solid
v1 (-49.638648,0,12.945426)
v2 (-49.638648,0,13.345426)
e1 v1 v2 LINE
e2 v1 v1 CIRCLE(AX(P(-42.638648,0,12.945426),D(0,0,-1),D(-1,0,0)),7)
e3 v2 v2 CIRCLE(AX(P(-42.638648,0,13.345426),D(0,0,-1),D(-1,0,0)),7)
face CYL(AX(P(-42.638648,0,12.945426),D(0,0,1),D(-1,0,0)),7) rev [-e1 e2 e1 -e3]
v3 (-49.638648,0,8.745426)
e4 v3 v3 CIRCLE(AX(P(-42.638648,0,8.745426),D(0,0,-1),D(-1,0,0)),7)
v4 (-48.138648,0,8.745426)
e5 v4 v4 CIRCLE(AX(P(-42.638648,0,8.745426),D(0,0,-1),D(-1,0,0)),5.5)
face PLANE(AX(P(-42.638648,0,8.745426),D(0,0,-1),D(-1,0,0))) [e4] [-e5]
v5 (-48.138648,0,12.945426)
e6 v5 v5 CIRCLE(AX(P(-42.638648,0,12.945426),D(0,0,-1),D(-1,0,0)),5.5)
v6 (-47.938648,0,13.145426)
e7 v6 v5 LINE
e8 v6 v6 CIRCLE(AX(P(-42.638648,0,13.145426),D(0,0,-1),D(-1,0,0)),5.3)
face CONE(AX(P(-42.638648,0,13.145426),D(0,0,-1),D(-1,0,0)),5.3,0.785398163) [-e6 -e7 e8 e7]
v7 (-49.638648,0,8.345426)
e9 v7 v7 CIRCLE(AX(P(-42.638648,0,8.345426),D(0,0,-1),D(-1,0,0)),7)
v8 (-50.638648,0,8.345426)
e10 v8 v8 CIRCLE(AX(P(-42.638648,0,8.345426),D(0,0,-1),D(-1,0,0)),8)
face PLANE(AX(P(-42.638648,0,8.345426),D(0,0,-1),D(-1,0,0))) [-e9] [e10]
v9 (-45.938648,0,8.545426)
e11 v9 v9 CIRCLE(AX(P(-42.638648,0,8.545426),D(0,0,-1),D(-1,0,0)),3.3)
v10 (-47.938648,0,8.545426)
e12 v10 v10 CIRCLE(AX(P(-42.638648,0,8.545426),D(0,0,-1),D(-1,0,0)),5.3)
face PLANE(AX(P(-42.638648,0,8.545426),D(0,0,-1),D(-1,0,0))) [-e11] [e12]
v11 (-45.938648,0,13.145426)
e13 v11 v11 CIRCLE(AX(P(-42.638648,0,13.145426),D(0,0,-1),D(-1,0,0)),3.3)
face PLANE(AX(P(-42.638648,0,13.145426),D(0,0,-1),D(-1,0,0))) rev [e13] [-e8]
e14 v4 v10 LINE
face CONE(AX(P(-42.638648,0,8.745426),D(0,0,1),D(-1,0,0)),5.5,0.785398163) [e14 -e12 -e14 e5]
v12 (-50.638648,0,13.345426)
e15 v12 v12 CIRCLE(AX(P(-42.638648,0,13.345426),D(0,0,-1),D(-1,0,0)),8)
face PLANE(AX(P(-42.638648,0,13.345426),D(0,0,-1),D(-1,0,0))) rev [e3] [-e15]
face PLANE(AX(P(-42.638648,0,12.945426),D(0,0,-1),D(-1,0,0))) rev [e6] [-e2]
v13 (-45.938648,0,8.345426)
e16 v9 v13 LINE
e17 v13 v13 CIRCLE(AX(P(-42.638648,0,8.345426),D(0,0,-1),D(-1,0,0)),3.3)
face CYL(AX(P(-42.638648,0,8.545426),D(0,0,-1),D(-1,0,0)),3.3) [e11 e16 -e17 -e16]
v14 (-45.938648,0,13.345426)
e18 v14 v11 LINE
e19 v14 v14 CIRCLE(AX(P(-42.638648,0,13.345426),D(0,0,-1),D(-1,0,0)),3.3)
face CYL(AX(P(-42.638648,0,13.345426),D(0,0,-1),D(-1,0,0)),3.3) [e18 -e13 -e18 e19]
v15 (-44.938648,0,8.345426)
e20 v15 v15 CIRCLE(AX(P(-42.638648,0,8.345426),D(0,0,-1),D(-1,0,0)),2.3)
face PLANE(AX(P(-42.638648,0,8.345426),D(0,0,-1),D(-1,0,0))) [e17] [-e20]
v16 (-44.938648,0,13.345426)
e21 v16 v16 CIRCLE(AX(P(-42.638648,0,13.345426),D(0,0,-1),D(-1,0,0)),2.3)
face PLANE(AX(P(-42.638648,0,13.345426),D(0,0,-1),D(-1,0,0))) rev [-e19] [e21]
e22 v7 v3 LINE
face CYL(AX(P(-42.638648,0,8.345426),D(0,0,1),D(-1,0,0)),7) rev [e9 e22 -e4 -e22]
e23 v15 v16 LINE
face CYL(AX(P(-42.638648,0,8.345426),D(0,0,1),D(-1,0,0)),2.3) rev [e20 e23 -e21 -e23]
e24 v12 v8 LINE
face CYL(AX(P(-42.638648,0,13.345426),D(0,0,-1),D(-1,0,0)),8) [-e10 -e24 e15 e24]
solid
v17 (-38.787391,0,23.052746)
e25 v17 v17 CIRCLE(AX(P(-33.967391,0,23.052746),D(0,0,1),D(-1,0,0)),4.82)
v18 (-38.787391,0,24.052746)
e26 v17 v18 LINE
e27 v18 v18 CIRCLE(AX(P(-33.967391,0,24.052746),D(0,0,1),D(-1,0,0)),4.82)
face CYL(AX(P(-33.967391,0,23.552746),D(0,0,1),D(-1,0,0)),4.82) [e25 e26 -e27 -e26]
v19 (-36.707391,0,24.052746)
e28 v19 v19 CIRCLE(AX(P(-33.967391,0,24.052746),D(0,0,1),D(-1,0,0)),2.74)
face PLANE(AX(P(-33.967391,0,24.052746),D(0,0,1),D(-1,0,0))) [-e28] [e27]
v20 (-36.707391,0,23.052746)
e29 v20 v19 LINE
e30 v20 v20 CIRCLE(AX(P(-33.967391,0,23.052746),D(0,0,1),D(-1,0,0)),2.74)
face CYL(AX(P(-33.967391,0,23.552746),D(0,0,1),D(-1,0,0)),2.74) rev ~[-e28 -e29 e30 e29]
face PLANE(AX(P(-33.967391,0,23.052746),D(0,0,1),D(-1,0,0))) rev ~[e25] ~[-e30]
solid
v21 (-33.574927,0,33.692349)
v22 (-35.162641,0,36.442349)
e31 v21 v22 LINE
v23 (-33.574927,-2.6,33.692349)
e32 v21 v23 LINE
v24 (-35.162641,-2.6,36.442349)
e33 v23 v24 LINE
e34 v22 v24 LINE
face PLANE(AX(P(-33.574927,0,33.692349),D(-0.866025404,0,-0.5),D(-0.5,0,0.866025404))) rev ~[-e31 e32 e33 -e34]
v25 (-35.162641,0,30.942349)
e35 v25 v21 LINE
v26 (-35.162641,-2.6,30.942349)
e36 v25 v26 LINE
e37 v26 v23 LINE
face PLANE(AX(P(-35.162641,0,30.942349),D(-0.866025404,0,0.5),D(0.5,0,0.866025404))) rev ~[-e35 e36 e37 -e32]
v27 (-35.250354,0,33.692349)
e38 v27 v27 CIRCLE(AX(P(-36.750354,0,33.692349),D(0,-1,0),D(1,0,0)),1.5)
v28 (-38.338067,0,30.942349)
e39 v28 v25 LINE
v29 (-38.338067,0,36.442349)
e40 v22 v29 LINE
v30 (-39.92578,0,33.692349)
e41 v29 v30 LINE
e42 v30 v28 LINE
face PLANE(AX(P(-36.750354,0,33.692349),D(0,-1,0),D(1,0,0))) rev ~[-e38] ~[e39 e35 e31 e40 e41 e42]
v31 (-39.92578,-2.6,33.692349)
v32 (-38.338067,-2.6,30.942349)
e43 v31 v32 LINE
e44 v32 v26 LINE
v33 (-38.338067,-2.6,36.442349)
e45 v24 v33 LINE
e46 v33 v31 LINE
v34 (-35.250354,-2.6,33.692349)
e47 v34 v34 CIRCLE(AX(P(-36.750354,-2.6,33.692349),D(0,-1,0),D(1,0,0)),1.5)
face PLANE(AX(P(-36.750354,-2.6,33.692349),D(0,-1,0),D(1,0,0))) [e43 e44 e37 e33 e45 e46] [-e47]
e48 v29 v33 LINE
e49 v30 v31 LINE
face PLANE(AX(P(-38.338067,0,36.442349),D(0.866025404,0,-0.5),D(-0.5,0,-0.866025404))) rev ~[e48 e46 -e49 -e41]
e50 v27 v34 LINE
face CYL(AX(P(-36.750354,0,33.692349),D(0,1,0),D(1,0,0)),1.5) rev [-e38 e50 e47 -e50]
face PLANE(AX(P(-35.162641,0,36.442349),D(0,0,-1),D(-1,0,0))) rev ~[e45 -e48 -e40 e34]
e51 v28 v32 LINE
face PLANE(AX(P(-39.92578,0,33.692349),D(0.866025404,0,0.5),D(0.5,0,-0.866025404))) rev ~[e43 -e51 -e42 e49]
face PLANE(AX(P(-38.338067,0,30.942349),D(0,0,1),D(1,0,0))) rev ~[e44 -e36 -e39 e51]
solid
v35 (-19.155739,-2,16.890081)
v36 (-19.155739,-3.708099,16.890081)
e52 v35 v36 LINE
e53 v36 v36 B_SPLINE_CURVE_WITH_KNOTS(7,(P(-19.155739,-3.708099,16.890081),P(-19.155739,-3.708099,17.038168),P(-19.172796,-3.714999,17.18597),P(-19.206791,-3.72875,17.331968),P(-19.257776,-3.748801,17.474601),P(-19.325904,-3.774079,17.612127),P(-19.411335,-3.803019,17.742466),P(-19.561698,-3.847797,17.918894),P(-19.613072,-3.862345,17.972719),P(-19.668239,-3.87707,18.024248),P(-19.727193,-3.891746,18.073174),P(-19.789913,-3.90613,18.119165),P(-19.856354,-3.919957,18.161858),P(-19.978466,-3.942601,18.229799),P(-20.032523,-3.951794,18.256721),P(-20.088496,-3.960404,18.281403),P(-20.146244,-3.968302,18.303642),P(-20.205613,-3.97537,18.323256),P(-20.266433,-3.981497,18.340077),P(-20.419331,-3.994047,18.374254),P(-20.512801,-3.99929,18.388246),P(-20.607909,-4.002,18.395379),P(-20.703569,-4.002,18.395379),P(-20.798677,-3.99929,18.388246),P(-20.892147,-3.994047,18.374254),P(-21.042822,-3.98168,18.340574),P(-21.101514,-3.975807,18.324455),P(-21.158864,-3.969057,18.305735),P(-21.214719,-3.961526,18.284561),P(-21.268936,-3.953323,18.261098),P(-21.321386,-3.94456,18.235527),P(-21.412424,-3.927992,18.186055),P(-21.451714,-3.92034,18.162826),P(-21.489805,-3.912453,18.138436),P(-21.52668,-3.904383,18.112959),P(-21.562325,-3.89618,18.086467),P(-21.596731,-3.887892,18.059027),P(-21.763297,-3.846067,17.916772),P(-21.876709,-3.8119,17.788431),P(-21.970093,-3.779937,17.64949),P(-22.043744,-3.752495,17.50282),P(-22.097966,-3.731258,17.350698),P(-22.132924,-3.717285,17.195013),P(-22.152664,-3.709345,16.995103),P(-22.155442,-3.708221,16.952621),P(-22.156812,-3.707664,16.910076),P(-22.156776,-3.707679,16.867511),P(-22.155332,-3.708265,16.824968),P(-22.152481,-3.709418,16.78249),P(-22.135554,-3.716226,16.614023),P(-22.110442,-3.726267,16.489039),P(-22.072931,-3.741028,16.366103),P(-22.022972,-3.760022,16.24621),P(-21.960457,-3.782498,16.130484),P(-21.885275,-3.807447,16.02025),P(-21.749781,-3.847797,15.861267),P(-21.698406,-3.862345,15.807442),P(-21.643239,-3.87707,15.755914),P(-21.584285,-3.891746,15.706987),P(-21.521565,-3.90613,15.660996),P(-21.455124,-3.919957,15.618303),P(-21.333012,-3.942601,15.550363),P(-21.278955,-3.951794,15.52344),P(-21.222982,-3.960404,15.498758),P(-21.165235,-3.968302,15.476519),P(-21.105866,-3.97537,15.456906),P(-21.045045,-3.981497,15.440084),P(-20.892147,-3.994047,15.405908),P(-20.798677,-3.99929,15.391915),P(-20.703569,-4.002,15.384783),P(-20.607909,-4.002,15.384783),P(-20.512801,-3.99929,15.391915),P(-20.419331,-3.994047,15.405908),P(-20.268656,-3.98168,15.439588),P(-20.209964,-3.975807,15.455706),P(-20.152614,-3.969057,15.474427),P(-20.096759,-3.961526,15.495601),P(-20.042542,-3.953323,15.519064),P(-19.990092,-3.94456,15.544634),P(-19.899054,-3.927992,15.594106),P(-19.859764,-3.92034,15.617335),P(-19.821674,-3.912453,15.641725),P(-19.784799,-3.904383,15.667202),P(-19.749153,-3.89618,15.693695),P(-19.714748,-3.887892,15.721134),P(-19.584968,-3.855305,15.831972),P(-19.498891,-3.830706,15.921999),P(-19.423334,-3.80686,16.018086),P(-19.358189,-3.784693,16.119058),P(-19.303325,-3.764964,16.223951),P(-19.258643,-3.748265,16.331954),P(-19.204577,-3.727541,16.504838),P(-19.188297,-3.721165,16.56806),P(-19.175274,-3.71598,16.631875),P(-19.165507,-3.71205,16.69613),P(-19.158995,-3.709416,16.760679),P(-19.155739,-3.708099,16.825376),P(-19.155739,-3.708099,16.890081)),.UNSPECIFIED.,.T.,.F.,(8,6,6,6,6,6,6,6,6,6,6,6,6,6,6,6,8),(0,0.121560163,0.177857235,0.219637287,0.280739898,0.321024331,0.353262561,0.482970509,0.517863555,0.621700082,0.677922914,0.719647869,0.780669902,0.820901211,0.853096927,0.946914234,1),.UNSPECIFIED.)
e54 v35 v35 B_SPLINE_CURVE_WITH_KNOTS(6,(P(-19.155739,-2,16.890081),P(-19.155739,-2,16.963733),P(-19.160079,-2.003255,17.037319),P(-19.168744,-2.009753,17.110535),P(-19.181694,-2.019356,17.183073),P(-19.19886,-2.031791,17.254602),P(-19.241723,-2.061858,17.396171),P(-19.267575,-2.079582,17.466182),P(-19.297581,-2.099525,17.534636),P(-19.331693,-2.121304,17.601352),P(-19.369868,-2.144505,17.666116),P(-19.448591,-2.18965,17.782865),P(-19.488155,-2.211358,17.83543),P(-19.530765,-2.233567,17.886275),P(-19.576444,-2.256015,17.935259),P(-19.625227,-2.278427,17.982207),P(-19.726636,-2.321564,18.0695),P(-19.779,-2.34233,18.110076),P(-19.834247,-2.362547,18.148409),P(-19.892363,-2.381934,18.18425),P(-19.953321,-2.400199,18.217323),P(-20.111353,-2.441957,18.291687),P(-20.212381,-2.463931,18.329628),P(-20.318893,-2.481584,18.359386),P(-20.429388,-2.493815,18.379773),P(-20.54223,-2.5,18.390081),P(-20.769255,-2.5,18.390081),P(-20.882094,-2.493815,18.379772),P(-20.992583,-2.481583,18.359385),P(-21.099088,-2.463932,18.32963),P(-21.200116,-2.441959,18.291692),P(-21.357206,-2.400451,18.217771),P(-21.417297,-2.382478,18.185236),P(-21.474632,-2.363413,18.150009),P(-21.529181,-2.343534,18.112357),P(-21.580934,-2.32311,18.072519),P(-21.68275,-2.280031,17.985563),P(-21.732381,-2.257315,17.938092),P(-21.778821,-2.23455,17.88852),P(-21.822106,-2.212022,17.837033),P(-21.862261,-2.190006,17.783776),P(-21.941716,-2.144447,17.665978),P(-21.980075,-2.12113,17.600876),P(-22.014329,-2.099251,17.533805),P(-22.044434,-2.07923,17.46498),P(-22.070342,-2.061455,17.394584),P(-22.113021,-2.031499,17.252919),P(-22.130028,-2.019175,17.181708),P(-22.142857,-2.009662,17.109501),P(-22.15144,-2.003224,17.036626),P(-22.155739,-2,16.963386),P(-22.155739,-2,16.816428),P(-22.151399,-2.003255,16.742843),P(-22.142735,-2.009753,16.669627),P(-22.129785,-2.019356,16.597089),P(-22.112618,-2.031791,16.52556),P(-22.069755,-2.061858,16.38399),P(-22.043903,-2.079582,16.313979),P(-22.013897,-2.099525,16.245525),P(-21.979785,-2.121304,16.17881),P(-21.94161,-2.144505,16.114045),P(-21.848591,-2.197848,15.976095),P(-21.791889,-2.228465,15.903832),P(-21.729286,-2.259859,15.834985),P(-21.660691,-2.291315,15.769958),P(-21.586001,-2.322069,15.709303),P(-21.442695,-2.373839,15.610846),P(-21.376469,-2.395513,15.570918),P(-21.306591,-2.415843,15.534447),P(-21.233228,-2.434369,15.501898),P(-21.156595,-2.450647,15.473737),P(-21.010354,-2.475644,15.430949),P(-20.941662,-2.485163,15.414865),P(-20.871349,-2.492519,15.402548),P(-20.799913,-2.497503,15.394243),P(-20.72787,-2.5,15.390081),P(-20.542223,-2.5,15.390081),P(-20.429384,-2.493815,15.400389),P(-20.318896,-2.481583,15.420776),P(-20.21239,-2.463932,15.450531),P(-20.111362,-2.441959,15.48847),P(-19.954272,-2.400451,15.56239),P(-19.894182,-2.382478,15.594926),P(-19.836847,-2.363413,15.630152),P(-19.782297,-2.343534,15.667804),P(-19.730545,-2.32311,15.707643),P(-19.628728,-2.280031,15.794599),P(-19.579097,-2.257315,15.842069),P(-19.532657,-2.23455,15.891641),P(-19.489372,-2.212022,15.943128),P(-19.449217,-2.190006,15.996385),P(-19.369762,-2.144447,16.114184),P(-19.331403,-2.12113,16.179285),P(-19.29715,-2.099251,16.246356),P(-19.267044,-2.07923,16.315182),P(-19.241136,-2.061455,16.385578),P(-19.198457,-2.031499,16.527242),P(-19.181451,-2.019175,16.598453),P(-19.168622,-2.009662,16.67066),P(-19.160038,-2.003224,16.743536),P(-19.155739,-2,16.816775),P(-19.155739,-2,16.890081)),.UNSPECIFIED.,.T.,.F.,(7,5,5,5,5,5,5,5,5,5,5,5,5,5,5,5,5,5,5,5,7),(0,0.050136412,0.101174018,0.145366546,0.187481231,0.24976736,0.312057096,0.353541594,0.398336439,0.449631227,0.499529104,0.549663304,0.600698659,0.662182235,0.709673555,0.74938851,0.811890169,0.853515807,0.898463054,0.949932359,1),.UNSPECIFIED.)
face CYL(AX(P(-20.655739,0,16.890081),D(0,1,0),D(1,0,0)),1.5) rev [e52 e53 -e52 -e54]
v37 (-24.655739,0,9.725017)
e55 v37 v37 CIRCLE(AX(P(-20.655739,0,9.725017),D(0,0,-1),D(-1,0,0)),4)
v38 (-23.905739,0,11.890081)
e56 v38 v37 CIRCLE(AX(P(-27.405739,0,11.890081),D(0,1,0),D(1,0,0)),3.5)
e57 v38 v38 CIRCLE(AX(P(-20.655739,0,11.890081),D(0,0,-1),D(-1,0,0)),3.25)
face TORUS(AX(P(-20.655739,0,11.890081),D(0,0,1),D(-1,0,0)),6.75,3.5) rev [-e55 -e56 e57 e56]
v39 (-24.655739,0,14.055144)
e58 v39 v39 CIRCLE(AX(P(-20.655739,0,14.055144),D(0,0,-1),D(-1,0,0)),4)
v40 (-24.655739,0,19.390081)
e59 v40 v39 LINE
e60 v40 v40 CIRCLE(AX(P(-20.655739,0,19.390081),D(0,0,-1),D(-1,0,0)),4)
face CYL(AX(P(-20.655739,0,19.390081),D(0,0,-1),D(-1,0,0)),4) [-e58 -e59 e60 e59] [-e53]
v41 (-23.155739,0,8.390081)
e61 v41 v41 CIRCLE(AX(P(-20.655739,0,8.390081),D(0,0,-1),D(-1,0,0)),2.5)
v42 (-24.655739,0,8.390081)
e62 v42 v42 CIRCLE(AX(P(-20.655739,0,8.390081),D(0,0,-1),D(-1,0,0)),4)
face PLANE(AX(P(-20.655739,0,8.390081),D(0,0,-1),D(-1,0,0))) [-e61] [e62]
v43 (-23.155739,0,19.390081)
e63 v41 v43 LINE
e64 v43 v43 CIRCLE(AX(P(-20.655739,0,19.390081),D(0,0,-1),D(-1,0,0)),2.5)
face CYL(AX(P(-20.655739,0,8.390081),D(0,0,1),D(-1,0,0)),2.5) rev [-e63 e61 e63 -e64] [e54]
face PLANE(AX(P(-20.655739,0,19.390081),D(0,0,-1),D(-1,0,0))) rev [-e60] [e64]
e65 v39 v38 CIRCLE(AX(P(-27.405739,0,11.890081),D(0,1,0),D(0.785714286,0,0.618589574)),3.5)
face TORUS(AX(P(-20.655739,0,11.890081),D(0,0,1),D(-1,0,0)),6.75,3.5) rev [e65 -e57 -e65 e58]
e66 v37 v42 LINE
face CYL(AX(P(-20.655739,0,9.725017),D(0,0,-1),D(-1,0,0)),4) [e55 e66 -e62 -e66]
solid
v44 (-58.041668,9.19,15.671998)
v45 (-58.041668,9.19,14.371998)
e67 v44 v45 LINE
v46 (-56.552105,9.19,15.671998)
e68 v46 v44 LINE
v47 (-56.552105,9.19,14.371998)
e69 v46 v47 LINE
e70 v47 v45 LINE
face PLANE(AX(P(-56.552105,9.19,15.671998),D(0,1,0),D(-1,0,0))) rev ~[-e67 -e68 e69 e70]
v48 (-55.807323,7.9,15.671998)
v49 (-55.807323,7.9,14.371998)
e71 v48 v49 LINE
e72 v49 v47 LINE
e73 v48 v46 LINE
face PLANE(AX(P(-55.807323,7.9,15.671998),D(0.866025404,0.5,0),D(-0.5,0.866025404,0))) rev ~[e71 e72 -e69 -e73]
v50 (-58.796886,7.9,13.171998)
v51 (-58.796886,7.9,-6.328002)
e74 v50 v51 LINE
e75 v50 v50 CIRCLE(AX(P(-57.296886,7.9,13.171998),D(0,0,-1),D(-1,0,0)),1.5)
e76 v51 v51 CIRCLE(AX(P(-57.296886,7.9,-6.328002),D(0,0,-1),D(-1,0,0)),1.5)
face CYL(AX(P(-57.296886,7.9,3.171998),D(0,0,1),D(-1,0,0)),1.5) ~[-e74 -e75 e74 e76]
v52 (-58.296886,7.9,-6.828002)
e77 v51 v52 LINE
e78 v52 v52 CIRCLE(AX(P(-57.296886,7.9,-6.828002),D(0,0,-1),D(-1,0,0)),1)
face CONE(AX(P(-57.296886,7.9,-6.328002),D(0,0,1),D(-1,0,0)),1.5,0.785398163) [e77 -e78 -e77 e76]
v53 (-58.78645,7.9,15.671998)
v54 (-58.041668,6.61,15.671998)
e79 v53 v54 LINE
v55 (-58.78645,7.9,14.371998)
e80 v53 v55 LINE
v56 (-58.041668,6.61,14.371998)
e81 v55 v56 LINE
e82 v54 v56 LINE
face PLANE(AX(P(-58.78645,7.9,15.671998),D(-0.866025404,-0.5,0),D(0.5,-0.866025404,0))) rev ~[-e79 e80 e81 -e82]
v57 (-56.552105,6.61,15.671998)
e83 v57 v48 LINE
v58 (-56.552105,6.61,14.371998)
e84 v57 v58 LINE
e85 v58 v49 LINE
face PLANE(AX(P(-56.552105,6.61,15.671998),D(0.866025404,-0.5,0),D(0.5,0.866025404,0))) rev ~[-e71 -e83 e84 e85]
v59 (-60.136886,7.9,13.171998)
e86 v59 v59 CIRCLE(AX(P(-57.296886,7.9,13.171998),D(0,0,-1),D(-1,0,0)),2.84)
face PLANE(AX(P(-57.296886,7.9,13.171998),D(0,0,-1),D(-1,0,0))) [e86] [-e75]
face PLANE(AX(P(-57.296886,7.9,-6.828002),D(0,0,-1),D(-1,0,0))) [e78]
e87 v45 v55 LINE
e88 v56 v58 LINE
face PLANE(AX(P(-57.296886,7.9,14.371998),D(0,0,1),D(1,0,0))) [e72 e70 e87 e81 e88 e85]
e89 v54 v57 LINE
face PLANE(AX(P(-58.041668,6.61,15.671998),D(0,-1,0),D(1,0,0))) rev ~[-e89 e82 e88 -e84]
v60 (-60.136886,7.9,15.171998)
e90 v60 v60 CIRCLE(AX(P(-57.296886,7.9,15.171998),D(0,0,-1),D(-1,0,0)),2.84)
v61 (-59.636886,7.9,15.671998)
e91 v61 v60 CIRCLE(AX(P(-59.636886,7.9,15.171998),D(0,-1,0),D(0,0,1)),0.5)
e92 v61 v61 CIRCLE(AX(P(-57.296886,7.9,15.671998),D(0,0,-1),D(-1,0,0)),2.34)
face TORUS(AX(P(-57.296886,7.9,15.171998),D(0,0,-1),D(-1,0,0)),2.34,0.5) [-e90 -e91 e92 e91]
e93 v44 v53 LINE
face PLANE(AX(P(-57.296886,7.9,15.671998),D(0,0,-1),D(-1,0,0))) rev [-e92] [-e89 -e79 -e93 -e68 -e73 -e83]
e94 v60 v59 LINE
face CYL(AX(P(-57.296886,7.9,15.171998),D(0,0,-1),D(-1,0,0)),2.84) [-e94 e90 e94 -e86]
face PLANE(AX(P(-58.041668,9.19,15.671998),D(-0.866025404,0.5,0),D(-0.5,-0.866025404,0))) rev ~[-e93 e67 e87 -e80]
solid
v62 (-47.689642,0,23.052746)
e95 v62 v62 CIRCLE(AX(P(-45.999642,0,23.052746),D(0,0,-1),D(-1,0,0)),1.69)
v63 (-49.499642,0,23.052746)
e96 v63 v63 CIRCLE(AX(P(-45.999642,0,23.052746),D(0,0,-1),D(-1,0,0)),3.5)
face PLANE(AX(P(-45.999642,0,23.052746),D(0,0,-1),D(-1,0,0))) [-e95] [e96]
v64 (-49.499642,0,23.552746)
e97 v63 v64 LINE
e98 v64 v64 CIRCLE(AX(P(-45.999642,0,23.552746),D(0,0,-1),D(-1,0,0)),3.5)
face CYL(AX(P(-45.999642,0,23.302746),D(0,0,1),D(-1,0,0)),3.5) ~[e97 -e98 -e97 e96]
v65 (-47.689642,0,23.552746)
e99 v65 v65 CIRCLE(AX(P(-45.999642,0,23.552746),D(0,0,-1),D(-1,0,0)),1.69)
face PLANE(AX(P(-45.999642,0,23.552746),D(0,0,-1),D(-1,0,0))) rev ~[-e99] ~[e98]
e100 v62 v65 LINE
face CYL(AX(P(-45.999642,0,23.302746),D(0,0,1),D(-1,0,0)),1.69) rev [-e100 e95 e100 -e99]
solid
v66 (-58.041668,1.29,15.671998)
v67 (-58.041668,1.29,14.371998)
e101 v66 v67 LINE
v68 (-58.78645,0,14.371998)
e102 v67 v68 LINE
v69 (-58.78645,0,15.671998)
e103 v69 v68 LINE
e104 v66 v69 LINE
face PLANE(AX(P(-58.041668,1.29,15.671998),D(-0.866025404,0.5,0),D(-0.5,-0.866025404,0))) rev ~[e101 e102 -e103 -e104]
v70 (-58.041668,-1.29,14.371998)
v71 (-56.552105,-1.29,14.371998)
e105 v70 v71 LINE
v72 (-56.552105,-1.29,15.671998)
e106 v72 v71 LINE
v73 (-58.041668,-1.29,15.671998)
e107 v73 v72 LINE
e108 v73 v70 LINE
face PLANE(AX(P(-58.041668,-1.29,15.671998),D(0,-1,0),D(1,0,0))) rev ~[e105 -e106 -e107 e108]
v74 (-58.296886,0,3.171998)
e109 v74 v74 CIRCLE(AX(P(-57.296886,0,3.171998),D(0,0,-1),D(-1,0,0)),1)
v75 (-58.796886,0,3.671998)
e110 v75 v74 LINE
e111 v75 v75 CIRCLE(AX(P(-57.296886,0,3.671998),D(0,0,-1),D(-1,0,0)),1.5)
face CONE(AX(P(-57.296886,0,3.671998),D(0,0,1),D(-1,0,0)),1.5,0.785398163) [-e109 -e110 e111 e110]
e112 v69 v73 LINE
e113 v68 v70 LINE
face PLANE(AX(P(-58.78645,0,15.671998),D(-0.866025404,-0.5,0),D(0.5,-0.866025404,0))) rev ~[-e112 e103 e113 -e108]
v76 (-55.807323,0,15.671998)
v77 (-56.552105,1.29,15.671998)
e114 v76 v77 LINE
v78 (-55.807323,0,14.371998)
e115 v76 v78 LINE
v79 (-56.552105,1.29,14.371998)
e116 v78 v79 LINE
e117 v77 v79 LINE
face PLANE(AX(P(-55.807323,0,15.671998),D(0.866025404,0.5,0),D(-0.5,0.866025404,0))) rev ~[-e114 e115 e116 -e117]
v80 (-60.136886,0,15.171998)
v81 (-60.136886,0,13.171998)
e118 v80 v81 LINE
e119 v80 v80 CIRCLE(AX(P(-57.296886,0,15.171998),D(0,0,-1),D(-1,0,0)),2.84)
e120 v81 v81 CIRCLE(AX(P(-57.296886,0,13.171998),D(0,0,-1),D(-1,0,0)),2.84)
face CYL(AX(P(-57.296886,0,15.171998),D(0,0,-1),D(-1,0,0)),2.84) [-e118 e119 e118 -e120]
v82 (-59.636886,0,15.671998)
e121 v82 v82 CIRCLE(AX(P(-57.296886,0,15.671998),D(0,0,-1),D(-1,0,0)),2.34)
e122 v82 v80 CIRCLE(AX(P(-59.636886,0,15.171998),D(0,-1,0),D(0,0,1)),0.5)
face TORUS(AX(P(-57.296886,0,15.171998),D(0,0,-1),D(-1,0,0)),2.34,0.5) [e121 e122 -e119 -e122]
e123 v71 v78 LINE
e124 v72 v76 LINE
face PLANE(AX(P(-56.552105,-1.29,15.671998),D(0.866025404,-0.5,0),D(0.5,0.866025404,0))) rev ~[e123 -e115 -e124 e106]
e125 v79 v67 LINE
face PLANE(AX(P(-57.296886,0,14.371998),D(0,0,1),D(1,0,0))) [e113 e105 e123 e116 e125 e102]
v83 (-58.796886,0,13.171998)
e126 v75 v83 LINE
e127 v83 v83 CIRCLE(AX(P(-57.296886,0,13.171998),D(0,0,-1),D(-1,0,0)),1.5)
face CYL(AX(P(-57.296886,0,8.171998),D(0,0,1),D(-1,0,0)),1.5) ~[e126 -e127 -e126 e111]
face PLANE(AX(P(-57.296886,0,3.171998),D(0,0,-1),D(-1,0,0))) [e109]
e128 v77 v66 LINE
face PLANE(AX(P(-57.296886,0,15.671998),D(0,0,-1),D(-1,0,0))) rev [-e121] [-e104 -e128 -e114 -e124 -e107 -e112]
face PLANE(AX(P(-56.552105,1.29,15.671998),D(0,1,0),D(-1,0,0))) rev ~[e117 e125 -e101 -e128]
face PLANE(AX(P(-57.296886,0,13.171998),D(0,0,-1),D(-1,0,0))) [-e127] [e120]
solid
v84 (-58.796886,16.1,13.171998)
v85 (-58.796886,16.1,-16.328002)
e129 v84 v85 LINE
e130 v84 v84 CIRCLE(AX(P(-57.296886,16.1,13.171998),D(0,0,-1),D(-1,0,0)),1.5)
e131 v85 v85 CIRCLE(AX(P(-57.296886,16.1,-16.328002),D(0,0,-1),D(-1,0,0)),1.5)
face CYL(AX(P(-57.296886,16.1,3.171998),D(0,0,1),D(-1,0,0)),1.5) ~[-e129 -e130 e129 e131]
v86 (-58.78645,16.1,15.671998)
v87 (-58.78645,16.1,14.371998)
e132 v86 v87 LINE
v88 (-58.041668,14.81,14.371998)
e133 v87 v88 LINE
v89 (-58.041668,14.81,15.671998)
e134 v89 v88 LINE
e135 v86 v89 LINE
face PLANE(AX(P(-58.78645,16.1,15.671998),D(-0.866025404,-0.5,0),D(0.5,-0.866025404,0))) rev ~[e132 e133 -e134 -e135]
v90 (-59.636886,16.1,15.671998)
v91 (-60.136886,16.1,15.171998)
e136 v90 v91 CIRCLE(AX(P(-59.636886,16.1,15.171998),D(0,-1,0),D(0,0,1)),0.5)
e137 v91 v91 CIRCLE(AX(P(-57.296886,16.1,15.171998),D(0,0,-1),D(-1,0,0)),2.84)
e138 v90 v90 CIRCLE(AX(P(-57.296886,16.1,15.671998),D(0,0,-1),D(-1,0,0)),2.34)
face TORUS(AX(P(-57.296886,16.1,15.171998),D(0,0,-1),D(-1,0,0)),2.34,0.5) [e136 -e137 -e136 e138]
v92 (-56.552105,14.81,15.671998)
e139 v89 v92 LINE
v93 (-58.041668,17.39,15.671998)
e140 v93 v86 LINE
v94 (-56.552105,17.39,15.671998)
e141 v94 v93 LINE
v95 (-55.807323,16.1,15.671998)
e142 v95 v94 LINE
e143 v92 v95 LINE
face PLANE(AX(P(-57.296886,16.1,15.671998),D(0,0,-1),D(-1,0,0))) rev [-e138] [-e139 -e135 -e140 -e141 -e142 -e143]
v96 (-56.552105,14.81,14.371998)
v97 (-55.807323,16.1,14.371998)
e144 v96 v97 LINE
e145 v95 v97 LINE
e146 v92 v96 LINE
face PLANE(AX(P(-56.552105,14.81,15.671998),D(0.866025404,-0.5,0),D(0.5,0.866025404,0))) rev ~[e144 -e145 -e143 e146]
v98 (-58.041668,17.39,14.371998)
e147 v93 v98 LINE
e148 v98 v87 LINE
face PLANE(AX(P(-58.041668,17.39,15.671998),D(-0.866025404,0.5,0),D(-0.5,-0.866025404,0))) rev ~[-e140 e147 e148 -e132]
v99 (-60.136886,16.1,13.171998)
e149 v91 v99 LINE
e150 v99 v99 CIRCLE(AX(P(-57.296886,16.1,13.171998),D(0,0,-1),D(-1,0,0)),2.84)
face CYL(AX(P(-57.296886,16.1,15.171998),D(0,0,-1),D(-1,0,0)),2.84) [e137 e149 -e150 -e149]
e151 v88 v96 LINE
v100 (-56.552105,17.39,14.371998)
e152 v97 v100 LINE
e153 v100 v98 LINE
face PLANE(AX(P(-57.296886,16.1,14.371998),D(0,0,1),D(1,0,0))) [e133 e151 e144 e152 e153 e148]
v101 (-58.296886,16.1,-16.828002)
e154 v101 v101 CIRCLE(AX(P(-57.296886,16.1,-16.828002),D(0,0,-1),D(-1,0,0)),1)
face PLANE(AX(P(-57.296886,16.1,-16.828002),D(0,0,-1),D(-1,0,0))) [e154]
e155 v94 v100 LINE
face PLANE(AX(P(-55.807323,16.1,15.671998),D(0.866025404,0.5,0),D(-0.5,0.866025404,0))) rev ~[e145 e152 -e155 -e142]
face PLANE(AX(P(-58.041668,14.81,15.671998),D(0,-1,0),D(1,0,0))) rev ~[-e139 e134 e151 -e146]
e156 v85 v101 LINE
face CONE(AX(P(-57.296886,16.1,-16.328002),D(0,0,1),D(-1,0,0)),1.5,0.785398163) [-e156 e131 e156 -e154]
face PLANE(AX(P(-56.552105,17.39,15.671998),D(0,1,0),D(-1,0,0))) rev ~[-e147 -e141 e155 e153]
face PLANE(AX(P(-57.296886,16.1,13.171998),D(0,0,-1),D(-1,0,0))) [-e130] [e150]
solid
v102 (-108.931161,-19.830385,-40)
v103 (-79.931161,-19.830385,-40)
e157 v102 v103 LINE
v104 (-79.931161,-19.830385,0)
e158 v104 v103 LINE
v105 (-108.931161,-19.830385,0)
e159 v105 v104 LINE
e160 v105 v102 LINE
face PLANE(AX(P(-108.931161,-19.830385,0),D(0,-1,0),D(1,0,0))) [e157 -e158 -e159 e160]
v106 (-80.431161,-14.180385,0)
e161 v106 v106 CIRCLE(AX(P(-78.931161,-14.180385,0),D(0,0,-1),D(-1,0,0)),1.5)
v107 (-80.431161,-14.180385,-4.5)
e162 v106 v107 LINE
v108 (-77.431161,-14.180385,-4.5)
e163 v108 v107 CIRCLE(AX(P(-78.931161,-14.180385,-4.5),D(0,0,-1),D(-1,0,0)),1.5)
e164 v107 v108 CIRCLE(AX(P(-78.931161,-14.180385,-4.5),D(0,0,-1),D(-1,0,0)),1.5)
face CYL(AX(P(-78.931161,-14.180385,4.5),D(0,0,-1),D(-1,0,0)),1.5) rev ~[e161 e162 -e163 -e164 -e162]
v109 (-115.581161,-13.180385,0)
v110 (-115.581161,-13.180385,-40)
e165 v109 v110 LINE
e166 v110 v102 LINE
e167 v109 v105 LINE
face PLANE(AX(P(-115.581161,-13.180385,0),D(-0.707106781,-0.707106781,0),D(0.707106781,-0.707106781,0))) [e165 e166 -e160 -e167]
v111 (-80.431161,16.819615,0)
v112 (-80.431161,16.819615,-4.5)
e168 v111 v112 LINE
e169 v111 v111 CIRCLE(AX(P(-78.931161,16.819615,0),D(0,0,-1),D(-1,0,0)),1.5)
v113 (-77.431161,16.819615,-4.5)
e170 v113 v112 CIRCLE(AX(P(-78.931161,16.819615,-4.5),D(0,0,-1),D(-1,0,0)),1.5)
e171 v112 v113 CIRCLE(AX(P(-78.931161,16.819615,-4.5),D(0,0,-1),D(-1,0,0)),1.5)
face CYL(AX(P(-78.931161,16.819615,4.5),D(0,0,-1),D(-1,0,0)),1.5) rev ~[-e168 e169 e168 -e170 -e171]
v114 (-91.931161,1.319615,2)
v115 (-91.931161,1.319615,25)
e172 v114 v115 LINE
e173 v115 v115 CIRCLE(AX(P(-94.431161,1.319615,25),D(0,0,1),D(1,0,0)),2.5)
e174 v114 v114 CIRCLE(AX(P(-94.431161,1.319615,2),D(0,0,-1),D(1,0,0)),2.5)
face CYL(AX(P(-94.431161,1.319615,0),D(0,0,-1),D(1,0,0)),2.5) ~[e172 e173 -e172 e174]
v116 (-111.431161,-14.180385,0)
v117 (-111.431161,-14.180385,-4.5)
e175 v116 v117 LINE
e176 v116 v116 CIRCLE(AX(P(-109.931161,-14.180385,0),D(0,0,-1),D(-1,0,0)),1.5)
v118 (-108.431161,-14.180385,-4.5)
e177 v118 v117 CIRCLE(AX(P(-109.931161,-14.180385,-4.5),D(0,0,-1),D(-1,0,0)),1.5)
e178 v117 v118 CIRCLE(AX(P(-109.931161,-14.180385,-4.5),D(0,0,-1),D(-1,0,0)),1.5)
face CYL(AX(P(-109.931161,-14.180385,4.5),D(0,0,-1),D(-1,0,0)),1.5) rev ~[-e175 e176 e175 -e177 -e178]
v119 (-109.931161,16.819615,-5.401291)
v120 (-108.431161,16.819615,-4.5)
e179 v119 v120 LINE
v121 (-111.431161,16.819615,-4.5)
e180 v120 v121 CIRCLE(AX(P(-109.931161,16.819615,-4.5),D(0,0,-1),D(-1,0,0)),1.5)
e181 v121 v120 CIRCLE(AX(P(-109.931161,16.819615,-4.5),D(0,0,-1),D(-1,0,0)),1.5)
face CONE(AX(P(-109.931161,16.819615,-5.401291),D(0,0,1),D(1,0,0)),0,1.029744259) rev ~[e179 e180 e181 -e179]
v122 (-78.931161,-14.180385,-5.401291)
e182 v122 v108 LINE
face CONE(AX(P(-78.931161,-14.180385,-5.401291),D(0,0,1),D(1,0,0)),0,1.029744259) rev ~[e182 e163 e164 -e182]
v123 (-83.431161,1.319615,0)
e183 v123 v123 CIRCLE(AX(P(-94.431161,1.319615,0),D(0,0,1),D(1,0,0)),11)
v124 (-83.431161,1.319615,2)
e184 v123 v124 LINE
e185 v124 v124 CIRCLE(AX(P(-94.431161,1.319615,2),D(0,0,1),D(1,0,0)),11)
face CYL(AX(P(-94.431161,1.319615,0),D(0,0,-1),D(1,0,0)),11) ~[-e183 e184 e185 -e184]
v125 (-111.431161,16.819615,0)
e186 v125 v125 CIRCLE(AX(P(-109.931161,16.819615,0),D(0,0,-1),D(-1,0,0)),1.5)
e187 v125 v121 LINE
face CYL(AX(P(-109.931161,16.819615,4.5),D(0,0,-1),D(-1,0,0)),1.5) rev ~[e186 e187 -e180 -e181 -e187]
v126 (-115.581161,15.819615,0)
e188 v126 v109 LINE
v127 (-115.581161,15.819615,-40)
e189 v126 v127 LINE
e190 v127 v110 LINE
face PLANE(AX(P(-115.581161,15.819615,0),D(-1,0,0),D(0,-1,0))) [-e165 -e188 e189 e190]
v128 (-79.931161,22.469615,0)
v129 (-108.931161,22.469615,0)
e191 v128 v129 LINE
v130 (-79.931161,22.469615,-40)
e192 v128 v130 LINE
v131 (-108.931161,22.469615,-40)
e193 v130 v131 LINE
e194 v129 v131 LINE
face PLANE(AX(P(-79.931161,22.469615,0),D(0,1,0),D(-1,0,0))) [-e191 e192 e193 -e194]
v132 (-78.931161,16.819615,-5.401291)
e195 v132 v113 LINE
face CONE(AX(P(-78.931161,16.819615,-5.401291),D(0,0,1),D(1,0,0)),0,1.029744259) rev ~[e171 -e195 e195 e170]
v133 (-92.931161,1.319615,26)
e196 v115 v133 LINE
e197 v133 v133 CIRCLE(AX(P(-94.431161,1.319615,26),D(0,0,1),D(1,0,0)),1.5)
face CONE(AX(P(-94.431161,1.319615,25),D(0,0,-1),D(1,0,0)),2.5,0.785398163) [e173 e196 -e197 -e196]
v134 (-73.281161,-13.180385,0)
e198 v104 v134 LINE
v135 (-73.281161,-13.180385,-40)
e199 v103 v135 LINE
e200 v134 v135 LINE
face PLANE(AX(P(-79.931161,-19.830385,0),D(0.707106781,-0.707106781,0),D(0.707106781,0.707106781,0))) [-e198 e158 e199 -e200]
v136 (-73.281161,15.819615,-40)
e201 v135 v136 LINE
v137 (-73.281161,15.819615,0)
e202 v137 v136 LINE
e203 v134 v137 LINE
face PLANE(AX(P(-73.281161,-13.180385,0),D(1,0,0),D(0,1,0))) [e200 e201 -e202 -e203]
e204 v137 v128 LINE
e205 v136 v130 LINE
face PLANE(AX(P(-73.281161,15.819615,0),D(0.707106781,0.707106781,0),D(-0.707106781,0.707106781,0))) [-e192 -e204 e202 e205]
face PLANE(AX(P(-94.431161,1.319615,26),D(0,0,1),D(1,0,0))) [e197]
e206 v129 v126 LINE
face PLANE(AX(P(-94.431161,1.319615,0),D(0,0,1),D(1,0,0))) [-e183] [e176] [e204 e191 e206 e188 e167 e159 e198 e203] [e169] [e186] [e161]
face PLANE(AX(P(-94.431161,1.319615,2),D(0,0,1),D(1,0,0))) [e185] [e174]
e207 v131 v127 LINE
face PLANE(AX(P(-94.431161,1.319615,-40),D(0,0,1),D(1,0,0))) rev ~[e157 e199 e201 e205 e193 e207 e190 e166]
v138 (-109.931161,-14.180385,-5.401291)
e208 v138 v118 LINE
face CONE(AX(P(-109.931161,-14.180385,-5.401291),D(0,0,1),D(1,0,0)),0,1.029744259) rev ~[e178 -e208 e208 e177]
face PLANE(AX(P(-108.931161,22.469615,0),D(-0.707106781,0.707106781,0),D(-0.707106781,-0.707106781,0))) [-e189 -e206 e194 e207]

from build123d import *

# Parameters (mm, degrees)
F0_R       = 1.5
F2_DEPTH   = 25
F4_R       = 11
F4_R_2     = 2.5
F5_DEPTH   = 2
F6_DEPTH   = 26
F7_DEPTH   = 40
F8_D       = 3
F8_DEPTH   = 4.5
F8_TIP     = 0.9012909285
F9_SIZE    = 1
F0_W       = 1.81
F0_H       = 0.5
F0_W_2     = 1.5
F0_H_2     = 10
F13_DEPTH  = 1.3
F15_DEPTH  = 20
F0_W_3     = 2.08
F0_H_3     = 1
F18_DEPTH  = 10
F19_SIZE   = 0.5
F19_2_SIZE = 0.5
F19_3_SIZE = 0.5
F20_DEPTH  = 2.6


with BuildPart() as f1:
    # F0 (on Front) → F1 (revolve)
    with BuildSketch(Plane.XZ):
        with BuildLine():
            Line((-23.1557391211, 19.3900806742), (-24.6557391211, 19.3900806742))
            Line((-24.6557391211, 19.3900806742), (-24.6557391211, 14.0551441836))
            ThreePointArc((-24.6557391211, 14.0551441836), (-24.0985499823, 13.0357245979), (-23.9057391211, 11.8900806742))
            ThreePointArc((-23.9057391211, 11.8900806742), (-24.0985499823, 10.7444367504), (-24.6557391211, 9.7250171647))
            Line((-24.6557391211, 9.7250171647), (-24.6557391211, 8.3900806742))
            Line((-24.6557391211, 8.3900806742), (-23.1557391211, 8.3900806742))
            Line((-23.1557391211, 8.3900806742), (-23.1557391211, 19.3900806742))
        make_face()
    revolve(axis=Axis((-20.6557391211, 0, 13.8900806742), (0, 0, -1)))

    # F0 (on Front) → F2 (cut)
    with BuildSketch(Plane.XZ):
        with Locations((-20.6557391211, 16.8900806742)):
            Circle(F0_R)
    extrude(amount=F2_DEPTH, mode=Mode.SUBTRACT)


with BuildPart() as f3:
    # F0 (on Front) → F3 (revolve)
    with BuildSketch(Plane.XZ):
        Polygon((-49.6386482716, 13.3454260603), (-50.6386482716, 13.3454260603), (-50.6386482716, 8.3454260603), (-49.6386482716, 8.3454260603), (-49.6386482716, 8.7454260603), (-48.1386482716, 8.7454260603), (-47.9386482716, 8.5454260603), (-45.9386482716, 8.5454260603), (-45.9386482716, 8.3454260603), (-44.9386482716, 8.3454260603), (-44.9386482716, 13.3454260603), (-45.9386482716, 13.3454260603), (-45.9386482716, 13.1454260603), (-47.9386482716, 13.1454260603), (-48.1386482716, 12.9454260603), (-49.6386482716, 12.9454260603), align=None)
    revolve(axis=Axis((-42.6386482716, 0, 10.8454260603), (0, 0, -1)))


with BuildPart() as f5:
    # F4 (on Top) → F5 (new body)
    with BuildSketch(Plane.XY):
        with Locations((-94.4311614871, 1.3196146563)):
            Circle(F4_R)
        with Locations((-94.4311614871, 1.3196146563)):
            Circle(F4_R_2, mode=Mode.SUBTRACT)
        with Locations((-94.4311614871, 1.3196146563)):
            Circle(F4_R_2)
    extrude(amount=F5_DEPTH)

    # F4 (on Top) → F6 (join)
    with BuildSketch(Plane.XY):
        with Locations((-94.4311614871, 1.3196146563)):
            Circle(F4_R_2)
    extrude(amount=F6_DEPTH)

    # F4 (on Top) → F7 (join)
    with BuildSketch(Plane.XY):
        Polygon((-108.9311614871, 22.4696146563), (-115.5811614871, 15.8196146563), (-115.5811614871, -13.1803853437), (-108.9311614871, -19.8303853437), (-79.9311614871, -19.8303853437), (-73.2811614871, -13.1803853437), (-73.2811614871, 15.8196146563), (-79.9311614871, 22.4696146563), align=None)
        with Locations((-94.4311614871, 1.3196146563)):
            Circle(F4_R, mode=Mode.SUBTRACT)
        with Locations((-94.4311614871, 1.3196146563)):
            Circle(F4_R)
        with Locations((-94.4311614871, 1.3196146563)):
            Circle(F4_R_2, mode=Mode.SUBTRACT)
        with Locations((-94.4311614871, 1.3196146563)):
            Circle(F4_R_2)
    extrude(amount=-F7_DEPTH)

    # F8
    with Locations(Plane.XY):
        with Locations((-78.9311614871, 16.8196146563), (-78.9311614871, -14.1803853437), (-109.9311614871, -14.1803853437), (-109.9311614871, 16.8196146563)):
            Hole(F8_D / 2, depth=F8_DEPTH)
            with Locations((0, 0, -(F8_DEPTH + F8_TIP / 2))):  # 118° drill point
                Cone(0, F8_D / 2, F8_TIP, mode=Mode.SUBTRACT)

    # F9
    f9_edges = [f5.edges().sort_by_distance(p)[0] for p in [
        (-96.931161, 1.319615, 26),
    ]]
    chamfer(f9_edges, length=F9_SIZE)


with BuildPart() as f10:
    # F0 (on Front) → F10 (revolve)
    with BuildSketch(Plane.XZ):
        with Locations((-48.5946421039, 23.3027455807)):
            Rectangle(F0_W, F0_H)
    revolve(axis=Axis((-45.9996421039, 0, 23.3027455807), (0, 0, -1)))


with BuildPart() as f11:
    # F0 (on Front) → F11 (revolve)
    with BuildSketch(Plane.XZ):
        with BuildLine():
            ThreePointArc((-59.6368863547, 15.6719975471), (-59.9904397453, 15.5255509377), (-60.1368863547, 15.1719975471))
            Line((-60.1368863547, 15.1719975471), (-60.1368863547, 13.1719975471))
            Line((-60.1368863547, 13.1719975471), (-58.7968863547, 13.1719975471))
            Line((-58.7968863547, 13.1719975471), (-57.2968863547, 13.1719975471))
            Line((-57.2968863547, 13.1719975471), (-57.2968863547, 15.6719975471))
            Line((-57.2968863547, 15.6719975471), (-59.6368863547, 15.6719975471))
        make_face()
        with Locations((-58.0468863547, 8.1719975471)):
            Rectangle(F0_W_2, F0_H_2)
    revolve(axis=Axis((-57.2968863547, 0, 8.1719975471), (0, 0, -1)))

    # F12 (on face) → F13 (cut)
    with BuildSketch(Plane.XY.offset(15.6719975471)):
        Polygon((-56.5521045074, 1.29), (-58.0416682019, 1.29), (-58.7864500492, 0), (-58.0416682019, -1.29), (-56.5521045074, -1.29), (-55.8073226602, 0), align=None)
    extrude(amount=-F13_DEPTH, mode=Mode.SUBTRACT)


with BuildPart() as f14_1:
    # F14: copy of F11
    add(f11.part.moved(Location((0, 16.1, 0))))

    # F15 (add): a face of the model
    f15_faces = [f14_1.faces().sort_by_distance(p)[0] for p in [
        (-57.2968863547, 16.1, 3.1719975471),
    ]]
    extrude(f15_faces, amount=F15_DEPTH)

    # F19#2
    f19_2_edges = [f14_1.edges().sort_by_distance(p)[0] for p in [
        (-55.796886, 16.1, -16.828002),
    ]]
    chamfer(f19_2_edges, length=F19_2_SIZE)


with BuildPart() as f16:
    # F0 (on Front) → F16 (revolve)
    with BuildSketch(Plane.XZ):
        with Locations((-37.7473910367, 23.5527455807)):
            Rectangle(F0_W_3, F0_H_3)
    revolve(axis=Axis((-33.9673910367, 0, 23.5527455807), (0, 0, 1)))


with BuildPart() as f17_1:
    # F17: copy of F11
    add(f11.part.moved(Location((0, 7.9, 0))))

    # F18 (add): a face of the model
    f18_faces = [f17_1.faces().sort_by_distance(p)[0] for p in [
        (-57.2968863547, 7.9, 3.1719975471),
    ]]
    extrude(f18_faces, amount=F18_DEPTH)

    # F19#3
    f19_3_edges = [f17_1.edges().sort_by_distance(p)[0] for p in [
        (-55.796886, 7.9, -6.828002),
    ]]
    chamfer(f19_3_edges, length=F19_3_SIZE)


with BuildPart() as f11_1:
    add(f11.part)

    # F19
    f19_edges = [f11_1.edges().sort_by_distance(p)[0] for p in [
        (-55.796886, 0, 3.171998),
    ]]
    chamfer(f19_edges, length=F19_SIZE)


with BuildPart() as f20:
    # F0 (on Front) → F20 (new body)
    with BuildSketch(Plane.XZ):
        Polygon((-38.338067113, 30.9423487484), (-35.1626406325, 30.9423487484), (-33.5749273922, 33.6923487484), (-35.1626406325, 36.4423487484), (-38.338067113, 36.4423487484), (-39.9257803533, 33.6923487484), align=None)
        with Locations((-36.7503538728, 33.6923487484)):
            Circle(F0_R, mode=Mode.SUBTRACT)
    extrude(amount=F20_DEPTH)


solid = Compound([f1.part, f3.part, f5.part, f10.part, f14_1.part, f16.part, f17_1.part, f11_1.part, f20.part])
